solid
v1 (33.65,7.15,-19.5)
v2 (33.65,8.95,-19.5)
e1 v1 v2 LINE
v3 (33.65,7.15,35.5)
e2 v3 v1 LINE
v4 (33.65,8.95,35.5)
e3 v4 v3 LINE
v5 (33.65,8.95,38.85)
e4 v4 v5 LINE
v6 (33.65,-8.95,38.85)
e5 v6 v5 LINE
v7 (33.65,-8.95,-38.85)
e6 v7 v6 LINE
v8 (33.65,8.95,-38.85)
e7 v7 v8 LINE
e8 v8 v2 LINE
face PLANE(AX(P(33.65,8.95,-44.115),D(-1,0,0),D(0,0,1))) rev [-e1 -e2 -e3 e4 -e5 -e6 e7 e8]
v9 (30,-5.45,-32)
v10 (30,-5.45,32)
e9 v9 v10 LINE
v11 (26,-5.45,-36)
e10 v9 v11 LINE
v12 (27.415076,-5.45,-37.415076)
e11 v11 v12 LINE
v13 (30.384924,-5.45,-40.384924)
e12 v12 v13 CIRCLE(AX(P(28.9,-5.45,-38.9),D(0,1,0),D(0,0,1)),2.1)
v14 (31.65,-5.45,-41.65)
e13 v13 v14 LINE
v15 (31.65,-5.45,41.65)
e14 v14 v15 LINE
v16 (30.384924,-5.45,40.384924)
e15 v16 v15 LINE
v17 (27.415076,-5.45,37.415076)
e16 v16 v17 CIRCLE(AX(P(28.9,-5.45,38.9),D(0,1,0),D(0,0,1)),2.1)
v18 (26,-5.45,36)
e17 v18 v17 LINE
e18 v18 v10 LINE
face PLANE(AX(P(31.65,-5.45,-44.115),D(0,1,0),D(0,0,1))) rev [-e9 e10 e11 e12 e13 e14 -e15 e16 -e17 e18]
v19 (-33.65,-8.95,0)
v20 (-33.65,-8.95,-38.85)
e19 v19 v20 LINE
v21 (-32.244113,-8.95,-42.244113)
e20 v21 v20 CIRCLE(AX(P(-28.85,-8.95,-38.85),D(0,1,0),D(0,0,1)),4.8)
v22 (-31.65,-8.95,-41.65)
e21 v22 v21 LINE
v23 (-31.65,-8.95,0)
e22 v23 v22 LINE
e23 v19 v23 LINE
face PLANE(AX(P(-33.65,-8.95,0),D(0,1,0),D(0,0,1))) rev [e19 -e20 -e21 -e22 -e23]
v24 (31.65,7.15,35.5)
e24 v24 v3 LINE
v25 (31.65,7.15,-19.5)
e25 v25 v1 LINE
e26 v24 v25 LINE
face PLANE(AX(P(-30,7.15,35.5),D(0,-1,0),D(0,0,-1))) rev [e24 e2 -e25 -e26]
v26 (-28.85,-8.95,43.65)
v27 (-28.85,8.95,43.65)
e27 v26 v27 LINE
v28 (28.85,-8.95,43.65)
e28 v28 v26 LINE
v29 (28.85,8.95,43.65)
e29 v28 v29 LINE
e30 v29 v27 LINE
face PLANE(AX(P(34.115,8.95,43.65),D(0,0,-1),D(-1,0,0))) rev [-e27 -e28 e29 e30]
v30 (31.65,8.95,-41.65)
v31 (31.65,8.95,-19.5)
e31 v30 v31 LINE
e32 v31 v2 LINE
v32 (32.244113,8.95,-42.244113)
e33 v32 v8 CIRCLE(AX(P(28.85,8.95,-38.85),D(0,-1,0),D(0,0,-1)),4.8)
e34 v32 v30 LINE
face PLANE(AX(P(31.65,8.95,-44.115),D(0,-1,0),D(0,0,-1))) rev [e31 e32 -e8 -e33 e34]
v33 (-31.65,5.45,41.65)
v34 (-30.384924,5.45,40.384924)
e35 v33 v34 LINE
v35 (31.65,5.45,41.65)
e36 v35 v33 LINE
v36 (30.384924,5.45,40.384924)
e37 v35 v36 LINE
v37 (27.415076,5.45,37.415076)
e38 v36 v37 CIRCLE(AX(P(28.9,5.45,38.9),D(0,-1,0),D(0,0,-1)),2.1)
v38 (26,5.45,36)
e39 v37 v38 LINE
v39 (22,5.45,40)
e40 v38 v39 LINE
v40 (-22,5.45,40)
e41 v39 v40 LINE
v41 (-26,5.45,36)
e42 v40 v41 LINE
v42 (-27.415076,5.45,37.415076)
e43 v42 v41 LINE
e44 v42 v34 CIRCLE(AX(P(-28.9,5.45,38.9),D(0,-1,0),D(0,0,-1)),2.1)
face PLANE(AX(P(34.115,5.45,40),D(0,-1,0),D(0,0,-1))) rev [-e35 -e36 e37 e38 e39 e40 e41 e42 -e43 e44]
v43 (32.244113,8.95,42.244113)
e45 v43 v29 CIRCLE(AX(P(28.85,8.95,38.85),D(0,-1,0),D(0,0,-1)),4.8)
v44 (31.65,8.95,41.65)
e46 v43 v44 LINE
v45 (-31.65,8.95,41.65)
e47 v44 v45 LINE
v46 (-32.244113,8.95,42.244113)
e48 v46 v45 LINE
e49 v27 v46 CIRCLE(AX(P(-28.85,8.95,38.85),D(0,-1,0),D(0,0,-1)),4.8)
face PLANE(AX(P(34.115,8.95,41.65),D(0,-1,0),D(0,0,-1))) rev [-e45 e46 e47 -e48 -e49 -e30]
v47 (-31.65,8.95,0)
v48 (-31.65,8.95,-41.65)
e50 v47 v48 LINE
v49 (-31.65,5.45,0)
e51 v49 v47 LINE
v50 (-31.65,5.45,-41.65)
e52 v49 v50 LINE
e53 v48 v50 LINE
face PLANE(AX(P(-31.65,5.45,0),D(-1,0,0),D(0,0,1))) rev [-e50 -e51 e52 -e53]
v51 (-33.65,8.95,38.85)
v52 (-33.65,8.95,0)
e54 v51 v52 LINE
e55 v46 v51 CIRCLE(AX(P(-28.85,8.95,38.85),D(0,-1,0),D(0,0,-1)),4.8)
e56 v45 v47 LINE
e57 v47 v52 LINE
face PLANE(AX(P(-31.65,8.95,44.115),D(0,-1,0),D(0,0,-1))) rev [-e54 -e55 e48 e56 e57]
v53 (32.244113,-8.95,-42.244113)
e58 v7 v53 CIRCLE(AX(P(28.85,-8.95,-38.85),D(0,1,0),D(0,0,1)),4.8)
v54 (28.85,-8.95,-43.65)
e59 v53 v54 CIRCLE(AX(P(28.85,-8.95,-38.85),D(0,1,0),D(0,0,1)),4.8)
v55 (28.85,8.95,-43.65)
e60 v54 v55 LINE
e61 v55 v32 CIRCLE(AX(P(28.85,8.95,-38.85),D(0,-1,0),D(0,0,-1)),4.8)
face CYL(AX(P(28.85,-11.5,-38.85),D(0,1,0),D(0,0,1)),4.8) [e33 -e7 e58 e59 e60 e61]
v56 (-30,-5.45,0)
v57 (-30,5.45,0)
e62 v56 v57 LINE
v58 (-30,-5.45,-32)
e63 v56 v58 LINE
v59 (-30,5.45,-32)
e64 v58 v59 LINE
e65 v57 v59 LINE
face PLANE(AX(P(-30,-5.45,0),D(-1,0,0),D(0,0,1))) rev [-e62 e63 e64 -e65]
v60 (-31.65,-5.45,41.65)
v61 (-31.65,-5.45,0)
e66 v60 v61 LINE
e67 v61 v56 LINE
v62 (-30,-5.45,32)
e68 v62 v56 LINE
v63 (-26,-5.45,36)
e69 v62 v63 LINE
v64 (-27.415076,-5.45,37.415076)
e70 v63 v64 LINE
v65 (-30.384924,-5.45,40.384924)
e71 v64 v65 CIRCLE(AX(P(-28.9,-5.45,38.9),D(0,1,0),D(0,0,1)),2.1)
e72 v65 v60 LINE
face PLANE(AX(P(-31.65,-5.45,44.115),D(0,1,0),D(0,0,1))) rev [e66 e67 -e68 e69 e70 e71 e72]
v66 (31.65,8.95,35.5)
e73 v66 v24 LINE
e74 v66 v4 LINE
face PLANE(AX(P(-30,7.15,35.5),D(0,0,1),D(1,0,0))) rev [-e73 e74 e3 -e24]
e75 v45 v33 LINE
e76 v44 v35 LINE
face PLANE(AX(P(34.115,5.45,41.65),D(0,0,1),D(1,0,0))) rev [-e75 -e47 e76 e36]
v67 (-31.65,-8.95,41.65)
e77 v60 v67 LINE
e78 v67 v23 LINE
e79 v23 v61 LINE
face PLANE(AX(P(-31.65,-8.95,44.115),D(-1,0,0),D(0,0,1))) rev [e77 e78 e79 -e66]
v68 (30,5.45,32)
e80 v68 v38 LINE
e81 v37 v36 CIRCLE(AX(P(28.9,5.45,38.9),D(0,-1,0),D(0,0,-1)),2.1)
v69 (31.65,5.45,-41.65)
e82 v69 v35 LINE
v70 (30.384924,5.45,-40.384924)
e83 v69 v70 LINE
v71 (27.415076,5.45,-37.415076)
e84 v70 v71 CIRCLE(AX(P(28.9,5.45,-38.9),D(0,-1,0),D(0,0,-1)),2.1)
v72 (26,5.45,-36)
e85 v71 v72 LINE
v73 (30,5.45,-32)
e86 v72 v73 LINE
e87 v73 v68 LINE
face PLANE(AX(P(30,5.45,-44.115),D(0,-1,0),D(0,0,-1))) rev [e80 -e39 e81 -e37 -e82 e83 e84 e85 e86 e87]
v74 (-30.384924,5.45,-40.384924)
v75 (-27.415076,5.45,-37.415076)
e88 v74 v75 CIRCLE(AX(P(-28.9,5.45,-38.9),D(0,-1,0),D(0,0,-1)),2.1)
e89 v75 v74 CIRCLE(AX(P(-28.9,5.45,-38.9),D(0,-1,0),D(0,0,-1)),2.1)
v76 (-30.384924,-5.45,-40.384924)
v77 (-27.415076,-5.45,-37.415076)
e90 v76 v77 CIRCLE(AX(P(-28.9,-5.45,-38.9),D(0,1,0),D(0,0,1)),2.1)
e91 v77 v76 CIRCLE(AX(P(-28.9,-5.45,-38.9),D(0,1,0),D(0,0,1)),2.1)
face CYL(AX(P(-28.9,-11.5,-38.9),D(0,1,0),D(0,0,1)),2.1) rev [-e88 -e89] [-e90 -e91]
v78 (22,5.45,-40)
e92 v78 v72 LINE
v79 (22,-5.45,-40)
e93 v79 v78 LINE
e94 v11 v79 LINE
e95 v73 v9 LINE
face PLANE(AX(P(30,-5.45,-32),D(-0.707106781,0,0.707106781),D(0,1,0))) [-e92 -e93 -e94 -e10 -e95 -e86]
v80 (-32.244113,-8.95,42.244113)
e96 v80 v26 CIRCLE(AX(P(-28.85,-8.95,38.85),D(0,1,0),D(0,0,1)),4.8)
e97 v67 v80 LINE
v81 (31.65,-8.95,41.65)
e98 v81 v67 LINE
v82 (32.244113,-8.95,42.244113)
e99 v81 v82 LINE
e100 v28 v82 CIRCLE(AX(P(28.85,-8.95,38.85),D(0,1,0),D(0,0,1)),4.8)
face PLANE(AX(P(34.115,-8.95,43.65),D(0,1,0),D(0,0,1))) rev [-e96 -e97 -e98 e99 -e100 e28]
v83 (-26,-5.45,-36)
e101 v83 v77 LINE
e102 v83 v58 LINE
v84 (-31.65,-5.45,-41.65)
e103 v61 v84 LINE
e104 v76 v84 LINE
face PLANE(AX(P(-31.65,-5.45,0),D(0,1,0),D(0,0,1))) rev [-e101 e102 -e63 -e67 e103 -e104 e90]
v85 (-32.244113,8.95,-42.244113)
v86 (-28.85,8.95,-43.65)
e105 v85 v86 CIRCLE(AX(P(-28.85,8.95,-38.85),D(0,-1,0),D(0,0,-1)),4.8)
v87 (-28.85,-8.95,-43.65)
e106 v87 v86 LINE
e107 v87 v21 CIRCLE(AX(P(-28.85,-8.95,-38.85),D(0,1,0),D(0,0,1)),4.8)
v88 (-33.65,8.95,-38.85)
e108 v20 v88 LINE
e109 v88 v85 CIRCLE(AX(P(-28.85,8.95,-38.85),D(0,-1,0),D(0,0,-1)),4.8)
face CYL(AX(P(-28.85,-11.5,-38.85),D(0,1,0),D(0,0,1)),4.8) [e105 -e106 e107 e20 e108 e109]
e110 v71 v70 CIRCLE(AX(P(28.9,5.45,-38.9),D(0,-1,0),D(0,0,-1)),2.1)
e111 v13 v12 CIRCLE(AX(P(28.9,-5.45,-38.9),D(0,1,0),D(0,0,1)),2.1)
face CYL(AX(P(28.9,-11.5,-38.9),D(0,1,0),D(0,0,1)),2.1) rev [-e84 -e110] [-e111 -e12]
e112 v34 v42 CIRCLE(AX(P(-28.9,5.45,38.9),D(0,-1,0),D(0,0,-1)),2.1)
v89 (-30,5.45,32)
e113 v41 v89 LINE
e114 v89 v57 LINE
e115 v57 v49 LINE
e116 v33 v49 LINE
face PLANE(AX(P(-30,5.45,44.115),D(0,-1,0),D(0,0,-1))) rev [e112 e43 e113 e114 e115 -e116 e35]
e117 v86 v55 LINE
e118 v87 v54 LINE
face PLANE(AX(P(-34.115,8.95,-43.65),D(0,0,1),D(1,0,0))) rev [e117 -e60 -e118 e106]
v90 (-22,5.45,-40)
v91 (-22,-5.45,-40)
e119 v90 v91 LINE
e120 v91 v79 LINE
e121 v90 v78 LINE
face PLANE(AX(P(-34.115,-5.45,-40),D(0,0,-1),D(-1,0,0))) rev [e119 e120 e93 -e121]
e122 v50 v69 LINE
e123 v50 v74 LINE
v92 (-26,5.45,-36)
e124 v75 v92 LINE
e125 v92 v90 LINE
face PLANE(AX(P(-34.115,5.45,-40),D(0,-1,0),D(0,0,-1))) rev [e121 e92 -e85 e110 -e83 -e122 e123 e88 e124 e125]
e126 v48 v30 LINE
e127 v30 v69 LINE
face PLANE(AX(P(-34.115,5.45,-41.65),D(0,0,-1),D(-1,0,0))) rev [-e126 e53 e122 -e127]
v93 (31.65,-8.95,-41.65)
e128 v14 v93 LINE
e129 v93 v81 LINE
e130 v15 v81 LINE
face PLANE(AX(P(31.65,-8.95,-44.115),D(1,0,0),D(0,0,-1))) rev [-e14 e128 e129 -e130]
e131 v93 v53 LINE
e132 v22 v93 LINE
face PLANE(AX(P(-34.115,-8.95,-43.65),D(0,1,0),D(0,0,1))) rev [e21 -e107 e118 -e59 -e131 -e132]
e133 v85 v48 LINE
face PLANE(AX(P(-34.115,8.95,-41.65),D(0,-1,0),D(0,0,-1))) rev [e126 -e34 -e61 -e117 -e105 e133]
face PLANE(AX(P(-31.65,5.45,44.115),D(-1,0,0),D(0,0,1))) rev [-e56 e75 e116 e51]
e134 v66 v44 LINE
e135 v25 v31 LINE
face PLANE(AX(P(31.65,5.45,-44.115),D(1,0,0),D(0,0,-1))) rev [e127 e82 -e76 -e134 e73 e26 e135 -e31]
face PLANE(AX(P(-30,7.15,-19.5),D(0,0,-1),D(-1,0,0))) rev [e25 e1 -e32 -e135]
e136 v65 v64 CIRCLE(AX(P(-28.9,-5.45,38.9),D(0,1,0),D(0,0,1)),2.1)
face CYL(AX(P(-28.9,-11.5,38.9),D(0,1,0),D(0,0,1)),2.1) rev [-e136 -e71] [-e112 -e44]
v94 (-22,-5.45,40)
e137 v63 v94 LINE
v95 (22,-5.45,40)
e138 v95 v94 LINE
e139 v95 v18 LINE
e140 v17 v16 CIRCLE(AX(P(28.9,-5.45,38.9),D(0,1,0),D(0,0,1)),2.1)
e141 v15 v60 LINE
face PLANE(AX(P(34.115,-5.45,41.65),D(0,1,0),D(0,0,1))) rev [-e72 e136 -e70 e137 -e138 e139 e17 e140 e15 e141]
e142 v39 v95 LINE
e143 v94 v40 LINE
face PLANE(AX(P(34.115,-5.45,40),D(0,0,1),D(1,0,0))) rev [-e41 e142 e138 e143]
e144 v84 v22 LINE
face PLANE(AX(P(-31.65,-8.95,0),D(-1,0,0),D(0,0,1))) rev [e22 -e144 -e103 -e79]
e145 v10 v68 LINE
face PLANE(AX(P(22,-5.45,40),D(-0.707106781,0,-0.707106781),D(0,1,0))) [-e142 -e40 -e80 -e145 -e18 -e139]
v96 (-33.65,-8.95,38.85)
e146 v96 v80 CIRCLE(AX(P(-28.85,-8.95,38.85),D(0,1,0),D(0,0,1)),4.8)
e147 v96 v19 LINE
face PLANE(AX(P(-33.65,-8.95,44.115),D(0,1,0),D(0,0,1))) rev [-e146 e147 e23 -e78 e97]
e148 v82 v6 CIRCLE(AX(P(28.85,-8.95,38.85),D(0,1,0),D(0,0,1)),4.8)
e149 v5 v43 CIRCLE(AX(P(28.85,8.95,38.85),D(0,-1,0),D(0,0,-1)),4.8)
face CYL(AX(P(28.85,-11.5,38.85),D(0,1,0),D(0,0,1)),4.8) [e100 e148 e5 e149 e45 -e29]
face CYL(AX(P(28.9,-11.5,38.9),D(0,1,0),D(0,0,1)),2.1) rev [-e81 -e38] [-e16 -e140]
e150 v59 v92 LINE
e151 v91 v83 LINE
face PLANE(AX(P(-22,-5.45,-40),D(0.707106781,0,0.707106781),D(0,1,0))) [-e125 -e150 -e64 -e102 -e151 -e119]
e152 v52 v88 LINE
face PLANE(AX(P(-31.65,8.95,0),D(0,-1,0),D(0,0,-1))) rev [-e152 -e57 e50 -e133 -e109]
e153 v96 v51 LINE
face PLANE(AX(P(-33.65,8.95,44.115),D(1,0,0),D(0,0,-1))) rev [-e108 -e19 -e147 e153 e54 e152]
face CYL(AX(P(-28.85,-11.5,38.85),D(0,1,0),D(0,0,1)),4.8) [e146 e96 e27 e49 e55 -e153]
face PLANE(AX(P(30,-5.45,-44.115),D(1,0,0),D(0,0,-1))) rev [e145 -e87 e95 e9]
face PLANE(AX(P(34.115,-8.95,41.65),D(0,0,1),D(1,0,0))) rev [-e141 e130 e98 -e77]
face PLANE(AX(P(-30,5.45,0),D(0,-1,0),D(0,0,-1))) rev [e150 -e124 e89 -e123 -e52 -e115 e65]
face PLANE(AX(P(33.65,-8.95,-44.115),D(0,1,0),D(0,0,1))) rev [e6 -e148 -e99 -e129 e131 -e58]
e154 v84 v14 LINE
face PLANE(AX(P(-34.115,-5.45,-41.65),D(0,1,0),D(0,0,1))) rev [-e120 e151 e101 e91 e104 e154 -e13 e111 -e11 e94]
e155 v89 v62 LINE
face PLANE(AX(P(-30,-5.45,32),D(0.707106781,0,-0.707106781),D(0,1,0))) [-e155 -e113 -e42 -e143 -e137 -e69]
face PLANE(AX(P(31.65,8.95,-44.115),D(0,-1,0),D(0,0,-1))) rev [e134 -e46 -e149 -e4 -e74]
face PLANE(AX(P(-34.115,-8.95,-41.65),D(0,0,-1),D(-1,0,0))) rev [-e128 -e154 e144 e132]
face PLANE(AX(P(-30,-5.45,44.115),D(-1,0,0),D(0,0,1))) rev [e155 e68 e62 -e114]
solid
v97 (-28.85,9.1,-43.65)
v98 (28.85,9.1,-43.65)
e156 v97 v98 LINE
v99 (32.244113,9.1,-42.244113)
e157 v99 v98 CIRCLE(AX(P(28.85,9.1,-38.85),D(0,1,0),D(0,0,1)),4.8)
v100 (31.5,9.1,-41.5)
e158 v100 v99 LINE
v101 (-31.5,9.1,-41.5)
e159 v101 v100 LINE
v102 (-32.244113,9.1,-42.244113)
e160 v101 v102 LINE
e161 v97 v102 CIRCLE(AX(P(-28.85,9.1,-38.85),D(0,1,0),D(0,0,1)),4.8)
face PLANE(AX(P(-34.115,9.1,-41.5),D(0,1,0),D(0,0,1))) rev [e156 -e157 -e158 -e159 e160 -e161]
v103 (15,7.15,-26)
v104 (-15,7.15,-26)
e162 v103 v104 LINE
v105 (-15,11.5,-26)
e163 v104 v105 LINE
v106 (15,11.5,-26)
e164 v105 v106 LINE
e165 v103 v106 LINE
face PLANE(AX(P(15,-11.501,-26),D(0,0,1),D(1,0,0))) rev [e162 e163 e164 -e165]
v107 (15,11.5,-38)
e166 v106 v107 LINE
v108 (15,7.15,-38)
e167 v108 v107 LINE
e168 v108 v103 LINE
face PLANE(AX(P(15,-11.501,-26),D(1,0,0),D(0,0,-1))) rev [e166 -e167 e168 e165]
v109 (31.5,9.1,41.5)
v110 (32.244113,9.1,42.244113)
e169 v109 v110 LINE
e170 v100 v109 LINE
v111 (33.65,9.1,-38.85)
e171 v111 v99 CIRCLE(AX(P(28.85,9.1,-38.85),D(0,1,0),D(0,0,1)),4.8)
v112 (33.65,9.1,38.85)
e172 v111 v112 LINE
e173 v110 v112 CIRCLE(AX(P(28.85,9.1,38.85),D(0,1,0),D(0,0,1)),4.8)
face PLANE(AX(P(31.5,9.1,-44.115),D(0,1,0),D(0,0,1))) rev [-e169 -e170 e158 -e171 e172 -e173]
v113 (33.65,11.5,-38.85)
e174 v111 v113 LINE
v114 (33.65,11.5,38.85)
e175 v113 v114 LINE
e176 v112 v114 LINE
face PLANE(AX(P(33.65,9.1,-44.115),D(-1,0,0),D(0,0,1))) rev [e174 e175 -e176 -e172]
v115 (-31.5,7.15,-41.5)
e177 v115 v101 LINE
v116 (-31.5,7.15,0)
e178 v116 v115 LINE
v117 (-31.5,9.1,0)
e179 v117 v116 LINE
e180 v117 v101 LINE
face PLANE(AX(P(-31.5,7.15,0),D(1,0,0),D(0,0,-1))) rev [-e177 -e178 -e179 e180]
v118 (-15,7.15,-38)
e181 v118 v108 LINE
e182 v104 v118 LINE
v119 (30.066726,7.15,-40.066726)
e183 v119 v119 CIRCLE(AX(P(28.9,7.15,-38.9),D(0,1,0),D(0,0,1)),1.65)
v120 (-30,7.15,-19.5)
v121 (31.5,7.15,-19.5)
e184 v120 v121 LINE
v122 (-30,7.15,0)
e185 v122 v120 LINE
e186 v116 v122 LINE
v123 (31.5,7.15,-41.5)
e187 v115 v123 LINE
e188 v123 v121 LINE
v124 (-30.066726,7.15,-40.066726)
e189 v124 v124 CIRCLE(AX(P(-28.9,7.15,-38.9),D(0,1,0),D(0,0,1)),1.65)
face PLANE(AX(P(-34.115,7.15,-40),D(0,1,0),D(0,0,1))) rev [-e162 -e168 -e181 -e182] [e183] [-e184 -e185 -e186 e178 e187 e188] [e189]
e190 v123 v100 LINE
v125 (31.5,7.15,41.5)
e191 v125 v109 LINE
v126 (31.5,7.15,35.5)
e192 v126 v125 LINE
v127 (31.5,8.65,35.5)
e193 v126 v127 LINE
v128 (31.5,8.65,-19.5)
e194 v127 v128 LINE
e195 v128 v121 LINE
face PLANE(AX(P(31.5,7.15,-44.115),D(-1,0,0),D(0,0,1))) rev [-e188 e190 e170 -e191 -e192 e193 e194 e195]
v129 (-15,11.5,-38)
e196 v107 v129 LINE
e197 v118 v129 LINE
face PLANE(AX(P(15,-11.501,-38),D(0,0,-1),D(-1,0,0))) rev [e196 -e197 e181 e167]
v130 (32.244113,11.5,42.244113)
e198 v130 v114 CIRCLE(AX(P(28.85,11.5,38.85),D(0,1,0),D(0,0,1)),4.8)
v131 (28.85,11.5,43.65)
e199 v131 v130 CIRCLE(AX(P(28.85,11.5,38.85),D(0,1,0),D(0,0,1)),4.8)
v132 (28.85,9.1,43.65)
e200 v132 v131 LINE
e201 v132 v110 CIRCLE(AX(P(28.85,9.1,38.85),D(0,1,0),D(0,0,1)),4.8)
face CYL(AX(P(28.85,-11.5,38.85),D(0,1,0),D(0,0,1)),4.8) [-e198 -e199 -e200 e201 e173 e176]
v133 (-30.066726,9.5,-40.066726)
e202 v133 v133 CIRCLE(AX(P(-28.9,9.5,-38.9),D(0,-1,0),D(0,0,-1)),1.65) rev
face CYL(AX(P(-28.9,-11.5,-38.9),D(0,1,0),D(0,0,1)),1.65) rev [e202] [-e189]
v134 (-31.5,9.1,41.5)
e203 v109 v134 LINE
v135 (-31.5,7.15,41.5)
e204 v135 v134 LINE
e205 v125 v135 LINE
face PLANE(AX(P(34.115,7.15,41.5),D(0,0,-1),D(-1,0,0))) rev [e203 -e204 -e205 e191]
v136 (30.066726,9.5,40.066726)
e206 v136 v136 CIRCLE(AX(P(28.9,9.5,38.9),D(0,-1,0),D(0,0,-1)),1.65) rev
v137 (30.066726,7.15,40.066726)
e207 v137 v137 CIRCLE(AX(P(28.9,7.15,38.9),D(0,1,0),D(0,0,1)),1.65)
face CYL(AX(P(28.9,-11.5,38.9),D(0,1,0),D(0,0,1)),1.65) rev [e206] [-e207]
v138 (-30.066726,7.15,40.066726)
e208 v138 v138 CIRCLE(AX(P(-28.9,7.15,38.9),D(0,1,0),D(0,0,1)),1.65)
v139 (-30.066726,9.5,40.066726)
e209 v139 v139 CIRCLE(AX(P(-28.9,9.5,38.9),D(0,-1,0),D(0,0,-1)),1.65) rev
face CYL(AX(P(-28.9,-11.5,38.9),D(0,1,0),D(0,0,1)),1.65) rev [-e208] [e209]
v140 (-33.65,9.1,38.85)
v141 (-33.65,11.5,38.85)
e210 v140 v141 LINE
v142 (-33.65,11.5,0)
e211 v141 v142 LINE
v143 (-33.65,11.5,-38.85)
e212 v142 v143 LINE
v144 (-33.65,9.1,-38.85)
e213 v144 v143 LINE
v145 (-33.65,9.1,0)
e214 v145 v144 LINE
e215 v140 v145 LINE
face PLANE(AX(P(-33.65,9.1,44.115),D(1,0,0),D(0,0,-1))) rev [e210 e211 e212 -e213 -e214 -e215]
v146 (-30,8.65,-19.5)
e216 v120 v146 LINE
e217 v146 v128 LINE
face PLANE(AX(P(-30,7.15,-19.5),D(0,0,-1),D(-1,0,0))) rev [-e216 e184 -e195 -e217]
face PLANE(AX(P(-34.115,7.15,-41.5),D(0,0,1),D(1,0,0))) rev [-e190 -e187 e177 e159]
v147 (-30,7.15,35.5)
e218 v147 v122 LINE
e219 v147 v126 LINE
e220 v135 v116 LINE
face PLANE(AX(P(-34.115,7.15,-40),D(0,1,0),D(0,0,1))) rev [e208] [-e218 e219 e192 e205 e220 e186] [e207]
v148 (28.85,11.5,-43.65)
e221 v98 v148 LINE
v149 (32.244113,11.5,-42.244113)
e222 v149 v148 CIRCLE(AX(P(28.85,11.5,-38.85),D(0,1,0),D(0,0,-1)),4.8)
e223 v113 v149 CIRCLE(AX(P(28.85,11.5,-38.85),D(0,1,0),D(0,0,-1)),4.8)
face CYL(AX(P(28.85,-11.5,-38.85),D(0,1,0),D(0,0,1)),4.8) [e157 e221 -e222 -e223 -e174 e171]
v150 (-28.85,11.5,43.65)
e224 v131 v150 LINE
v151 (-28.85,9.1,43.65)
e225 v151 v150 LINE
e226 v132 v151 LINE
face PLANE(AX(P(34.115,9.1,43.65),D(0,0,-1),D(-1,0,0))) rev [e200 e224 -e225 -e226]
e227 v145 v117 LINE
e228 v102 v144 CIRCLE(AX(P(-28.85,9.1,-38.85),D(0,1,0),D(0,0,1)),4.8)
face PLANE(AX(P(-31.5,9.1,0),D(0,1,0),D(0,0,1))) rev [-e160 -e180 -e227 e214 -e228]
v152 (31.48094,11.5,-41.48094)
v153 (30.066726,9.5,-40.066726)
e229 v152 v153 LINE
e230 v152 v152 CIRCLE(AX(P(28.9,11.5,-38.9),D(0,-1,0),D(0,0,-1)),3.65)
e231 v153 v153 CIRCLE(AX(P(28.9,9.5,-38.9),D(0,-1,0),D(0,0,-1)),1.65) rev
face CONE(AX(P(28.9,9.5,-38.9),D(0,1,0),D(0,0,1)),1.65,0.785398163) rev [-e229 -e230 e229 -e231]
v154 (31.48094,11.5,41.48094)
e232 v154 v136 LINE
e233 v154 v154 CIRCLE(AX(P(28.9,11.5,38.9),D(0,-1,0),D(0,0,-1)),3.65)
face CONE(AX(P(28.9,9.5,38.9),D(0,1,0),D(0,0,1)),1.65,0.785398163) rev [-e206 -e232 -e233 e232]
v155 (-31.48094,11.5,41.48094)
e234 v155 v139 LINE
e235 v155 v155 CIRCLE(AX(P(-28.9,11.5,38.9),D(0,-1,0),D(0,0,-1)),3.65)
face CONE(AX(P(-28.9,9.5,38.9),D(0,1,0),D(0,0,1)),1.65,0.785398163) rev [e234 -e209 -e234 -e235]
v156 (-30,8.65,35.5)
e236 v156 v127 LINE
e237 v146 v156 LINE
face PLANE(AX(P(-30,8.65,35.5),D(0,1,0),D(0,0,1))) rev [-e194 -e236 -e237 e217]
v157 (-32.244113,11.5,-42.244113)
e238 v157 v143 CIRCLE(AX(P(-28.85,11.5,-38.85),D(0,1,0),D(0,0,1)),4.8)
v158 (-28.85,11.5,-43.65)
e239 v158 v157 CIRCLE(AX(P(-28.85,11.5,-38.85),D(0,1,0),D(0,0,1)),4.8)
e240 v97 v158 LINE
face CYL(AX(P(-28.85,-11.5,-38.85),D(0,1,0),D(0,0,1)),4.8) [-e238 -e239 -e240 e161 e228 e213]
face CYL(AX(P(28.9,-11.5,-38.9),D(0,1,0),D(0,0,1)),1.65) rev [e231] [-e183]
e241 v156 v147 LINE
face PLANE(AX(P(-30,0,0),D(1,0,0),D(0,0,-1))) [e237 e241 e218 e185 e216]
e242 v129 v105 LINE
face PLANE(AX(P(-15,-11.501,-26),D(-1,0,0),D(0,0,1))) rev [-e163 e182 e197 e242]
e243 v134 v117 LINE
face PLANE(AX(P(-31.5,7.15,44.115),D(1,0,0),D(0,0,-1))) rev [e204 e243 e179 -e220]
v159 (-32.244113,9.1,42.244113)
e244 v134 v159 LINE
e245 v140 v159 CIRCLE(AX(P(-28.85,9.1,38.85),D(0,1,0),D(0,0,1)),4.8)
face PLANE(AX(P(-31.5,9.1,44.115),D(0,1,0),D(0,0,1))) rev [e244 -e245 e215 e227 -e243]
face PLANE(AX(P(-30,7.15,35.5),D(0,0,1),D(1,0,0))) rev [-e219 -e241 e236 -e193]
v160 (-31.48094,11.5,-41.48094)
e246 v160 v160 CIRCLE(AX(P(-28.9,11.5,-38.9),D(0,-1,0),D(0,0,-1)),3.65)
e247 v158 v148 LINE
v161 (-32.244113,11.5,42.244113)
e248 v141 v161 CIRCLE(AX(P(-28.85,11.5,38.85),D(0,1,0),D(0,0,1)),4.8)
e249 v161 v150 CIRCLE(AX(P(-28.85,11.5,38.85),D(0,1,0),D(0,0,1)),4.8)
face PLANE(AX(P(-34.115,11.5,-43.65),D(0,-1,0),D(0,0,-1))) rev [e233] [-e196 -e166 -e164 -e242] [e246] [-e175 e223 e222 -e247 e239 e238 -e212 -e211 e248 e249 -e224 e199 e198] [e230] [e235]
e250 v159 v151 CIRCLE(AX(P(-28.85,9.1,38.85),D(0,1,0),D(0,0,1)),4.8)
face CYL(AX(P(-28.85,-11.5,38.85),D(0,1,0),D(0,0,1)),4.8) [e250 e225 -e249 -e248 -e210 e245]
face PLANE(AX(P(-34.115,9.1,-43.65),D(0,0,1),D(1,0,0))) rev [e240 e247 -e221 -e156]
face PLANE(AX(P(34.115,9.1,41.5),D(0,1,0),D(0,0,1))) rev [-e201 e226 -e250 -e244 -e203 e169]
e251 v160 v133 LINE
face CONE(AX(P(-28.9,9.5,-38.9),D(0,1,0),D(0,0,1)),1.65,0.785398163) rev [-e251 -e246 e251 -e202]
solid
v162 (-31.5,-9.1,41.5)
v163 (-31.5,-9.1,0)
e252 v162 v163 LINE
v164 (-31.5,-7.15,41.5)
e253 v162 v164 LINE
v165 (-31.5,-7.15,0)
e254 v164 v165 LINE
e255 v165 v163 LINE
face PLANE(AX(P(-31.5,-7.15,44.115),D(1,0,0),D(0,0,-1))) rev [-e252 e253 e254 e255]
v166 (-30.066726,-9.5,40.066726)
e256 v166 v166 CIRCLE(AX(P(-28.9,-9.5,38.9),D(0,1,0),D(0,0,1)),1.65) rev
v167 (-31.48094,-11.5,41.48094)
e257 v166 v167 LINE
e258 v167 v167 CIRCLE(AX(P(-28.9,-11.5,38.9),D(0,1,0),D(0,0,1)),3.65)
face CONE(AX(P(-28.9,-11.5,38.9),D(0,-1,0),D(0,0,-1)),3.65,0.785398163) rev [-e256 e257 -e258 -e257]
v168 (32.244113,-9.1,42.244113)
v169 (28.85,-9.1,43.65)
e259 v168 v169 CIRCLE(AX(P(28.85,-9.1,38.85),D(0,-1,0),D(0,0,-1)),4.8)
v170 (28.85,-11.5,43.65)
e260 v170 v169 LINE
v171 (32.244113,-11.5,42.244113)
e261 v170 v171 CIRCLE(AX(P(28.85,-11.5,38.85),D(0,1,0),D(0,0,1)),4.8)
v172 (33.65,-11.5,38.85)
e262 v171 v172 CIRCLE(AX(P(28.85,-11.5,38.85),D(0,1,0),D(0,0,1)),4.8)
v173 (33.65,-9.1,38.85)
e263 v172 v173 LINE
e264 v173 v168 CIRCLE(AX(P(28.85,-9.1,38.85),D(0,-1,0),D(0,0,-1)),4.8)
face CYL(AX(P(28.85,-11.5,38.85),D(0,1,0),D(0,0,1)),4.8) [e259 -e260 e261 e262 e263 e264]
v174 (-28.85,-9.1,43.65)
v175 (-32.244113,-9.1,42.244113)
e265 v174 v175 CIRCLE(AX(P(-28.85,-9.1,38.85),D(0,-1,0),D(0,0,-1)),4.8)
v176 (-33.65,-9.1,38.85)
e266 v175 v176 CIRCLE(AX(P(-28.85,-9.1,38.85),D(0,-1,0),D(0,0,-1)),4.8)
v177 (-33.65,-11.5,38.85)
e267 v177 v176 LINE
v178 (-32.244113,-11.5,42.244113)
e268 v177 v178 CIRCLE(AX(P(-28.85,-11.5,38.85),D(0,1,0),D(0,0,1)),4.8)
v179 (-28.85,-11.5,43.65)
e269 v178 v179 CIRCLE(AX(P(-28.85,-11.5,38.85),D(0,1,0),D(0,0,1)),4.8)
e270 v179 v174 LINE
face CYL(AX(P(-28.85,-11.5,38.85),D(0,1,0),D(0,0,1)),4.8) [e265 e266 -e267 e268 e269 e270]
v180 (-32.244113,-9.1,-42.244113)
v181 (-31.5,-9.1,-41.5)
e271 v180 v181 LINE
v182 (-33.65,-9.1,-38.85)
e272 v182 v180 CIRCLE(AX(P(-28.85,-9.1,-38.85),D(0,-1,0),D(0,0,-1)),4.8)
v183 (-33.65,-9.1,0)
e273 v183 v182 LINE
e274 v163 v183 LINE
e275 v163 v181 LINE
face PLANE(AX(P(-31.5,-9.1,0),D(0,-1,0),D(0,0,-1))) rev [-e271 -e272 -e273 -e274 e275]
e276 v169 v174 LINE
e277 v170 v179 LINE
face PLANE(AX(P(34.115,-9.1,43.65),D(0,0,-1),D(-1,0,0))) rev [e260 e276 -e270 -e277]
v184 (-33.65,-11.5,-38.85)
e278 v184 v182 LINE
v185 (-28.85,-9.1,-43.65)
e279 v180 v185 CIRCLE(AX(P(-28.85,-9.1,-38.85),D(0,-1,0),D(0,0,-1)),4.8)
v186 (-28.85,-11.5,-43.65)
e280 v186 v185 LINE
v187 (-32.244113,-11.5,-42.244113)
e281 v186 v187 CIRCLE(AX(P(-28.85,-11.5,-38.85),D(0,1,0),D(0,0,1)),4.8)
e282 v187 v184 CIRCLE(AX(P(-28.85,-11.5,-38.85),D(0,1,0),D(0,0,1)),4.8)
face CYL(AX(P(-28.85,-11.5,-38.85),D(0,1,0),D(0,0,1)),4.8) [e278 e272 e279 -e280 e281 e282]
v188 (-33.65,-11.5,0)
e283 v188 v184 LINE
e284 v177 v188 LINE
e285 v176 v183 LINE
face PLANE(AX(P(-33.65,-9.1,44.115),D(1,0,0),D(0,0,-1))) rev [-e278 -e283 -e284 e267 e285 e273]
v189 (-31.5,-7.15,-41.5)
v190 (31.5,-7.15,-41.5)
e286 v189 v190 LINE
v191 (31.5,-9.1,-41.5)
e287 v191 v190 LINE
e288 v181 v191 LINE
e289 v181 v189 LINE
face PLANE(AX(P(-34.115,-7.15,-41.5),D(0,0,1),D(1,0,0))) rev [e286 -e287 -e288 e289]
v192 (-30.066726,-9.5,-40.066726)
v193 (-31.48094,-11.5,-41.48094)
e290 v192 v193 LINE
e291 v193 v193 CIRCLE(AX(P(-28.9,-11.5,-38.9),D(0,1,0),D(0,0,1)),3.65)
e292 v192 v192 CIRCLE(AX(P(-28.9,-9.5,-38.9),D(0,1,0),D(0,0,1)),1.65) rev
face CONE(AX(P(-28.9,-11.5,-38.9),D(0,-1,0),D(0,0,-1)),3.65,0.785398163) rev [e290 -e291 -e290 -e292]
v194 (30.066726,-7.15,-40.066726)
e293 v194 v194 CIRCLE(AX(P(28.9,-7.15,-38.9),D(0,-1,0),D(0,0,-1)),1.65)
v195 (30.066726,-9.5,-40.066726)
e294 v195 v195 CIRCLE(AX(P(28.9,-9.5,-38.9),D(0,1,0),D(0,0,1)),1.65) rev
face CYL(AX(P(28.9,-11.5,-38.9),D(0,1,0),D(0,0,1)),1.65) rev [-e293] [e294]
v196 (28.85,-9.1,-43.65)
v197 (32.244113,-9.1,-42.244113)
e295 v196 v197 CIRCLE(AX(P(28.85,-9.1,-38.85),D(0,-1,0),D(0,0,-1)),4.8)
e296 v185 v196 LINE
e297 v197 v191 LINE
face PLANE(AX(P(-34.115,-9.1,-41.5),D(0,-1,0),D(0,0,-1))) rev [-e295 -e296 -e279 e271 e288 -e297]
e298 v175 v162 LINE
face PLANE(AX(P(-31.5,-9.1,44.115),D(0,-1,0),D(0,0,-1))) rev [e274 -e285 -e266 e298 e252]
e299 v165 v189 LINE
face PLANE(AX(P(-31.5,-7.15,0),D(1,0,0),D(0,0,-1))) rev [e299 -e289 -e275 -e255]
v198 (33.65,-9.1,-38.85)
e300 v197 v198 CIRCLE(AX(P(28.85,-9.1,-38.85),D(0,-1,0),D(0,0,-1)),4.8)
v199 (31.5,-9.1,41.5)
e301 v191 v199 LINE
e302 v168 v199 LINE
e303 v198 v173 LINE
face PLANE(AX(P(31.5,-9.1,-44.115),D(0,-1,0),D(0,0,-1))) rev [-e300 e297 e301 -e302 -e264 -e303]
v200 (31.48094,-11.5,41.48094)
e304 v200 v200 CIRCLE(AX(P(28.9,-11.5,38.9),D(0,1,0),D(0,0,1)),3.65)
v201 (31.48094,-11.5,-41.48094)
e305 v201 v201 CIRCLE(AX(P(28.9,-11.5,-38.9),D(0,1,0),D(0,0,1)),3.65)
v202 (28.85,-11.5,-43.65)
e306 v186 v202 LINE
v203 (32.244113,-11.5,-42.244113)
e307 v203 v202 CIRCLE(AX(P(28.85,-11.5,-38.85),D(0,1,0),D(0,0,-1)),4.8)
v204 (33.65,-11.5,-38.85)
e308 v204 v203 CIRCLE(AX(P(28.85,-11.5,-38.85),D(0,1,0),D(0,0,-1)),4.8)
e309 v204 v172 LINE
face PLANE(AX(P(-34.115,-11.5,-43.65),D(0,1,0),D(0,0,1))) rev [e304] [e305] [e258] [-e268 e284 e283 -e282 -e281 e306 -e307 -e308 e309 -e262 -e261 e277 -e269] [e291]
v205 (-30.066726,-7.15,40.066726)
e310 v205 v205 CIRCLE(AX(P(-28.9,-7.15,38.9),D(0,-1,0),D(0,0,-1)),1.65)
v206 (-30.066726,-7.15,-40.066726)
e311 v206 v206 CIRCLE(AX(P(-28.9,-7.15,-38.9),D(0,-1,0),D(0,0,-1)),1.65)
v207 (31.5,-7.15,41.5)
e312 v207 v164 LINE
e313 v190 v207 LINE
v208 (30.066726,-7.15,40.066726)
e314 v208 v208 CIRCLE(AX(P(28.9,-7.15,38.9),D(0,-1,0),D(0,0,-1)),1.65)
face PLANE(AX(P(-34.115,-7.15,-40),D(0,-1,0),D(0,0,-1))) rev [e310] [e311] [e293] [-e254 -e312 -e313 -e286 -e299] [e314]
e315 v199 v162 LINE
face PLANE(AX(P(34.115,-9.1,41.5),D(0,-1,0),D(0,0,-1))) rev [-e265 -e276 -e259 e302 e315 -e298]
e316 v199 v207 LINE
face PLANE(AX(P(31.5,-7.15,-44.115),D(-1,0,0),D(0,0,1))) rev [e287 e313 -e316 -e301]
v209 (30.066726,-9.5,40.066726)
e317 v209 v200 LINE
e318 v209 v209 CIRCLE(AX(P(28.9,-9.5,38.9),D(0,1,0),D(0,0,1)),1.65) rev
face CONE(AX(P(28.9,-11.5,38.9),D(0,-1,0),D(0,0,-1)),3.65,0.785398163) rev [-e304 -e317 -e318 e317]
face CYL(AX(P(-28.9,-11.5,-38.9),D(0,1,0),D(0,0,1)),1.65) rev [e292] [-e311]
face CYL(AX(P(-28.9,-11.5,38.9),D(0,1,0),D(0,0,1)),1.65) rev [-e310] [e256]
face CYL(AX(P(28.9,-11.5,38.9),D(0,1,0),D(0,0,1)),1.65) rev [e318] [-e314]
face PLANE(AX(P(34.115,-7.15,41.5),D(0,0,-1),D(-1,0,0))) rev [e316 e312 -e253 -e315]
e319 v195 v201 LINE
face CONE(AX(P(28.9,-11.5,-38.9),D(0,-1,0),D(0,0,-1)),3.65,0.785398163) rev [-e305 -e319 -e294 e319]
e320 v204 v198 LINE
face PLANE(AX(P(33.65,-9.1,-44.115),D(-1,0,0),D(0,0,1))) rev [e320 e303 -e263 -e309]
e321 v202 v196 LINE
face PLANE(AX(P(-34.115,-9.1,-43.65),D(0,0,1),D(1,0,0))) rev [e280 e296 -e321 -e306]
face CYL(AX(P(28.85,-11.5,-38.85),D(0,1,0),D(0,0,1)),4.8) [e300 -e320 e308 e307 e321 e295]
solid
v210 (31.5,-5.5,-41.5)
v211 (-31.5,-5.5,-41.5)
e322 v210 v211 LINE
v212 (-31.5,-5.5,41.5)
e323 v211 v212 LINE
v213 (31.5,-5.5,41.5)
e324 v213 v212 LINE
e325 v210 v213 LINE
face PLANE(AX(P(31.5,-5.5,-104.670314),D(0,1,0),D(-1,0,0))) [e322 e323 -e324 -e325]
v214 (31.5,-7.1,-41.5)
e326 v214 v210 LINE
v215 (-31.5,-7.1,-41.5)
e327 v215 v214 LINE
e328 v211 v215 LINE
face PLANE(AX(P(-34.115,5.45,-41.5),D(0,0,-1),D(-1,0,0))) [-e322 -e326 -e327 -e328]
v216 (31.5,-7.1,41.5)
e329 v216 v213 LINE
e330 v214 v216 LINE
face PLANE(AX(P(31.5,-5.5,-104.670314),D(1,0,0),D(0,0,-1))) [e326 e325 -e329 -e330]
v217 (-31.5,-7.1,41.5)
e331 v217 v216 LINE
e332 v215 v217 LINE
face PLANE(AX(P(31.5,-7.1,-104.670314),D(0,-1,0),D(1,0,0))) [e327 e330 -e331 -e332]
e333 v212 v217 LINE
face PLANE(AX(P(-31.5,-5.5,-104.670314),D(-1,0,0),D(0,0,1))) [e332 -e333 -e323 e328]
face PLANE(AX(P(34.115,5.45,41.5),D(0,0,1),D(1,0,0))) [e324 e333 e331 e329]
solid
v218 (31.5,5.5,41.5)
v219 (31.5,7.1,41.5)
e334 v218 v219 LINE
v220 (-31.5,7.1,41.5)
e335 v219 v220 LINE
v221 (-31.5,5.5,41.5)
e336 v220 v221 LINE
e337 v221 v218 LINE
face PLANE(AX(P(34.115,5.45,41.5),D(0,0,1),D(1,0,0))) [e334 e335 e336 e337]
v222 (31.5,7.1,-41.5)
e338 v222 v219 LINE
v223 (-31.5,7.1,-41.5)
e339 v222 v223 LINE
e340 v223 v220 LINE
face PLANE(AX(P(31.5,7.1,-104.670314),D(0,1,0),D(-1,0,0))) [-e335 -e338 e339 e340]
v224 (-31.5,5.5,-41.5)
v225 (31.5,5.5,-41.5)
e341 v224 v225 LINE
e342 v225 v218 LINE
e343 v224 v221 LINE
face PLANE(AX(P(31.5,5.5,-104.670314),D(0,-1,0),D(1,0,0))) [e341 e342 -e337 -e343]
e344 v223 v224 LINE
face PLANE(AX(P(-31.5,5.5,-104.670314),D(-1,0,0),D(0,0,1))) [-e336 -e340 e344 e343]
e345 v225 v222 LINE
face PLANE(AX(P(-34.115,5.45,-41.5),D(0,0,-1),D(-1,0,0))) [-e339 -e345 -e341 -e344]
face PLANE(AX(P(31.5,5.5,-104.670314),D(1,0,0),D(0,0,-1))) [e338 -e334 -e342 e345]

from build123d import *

# Parameters (mm, degrees)
MATERIAL_BOHRUNGEN_SIZE        = 8
SKETCH7_W                      = 60
SKETCH7_H                      = 80
TOP_DEPTH                      = 4.35
SKETCH9_W                      = 60
SKETCH9_H                      = 80
BOT_DEPTH                      = 4.35
RADIUS_AUSSENKANTEN_DEPTH      = 57.301820574
RADIUS_AUSSENKANTEN_DEPTH_BACK = 57.301820574
SKETCH8_OUTSIDE_W              = 91.82
SKETCH8_OUTSIDE_H              = 111.82
BOHRUNGEN_START                = -5.45
BOHRUNGEN_4MM_OUTLINE_R        = 2.1
BOHRUNGEN_4MM_DEPTH            = 10.9
BOHRUNGEN_3MM_DEPTH            = 57.301820574
BOHRUNGEN_3MM_DEPTH_BACK       = 57.301820574
SKETCH10_R                     = 1.65
BOHRUNGEN_FASE_1_SIZE          = 2
BOHRUNGEN_FASE_2_SIZE          = 2
KARTENSCHLITZ_DEPTH            = 57.301820574
KARTENSCHLITZ_DEPTH_BACK       = 30
SKETCH12_W                     = 55
SKETCH12_H                     = 1.5
CUT_EXTRUDE5_START             = 31.65
SKETCH13_W                     = 55
SKETCH13_H                     = 0.3
CUT_EXTRUDE5_DEPTH             = 2
BOSS_EXTRUDE3_DEPTH            = 41.5
BOSS_EXTRUDE3_DEPTH_BACK       = 41.5
SKETCH14_W                     = 63
SKETCH14_H                     = 1.6
BOSS_EXTRUDE3_2_DEPTH          = 41.5
BOSS_EXTRUDE3_2_DEPTH_BACK     = 41.5
SKETCH15_W                     = 30
SKETCH15_H                     = 12
CUT_EXTRUDE6_DEPTH             = 4.35


# Read off the part's stored shape, not the designer's step: Bohrungen 4mm
with BuildPart() as part:
    # Mid: sweep along a path in Path
    with BuildLine(Plane(origin=(0, 0, 0), x_dir=(1, 0, 0), z_dir=(0, 1, 0))) as mid_path:
        Line((30, -40), (-30, -40))
        Line((-30, -40), (-30, 40))
        Line((-30, 40), (30, 40))
        Line((30, 40), (30, -40))
    # Profile → Mid (sweep)
    with BuildSketch(Plane.XY):
        Polygon((-33.65, -8.95), (-31.65, -8.95), (-31.65, -5.45), (-30, -5.45), (-30, 5.45), (-31.65, 5.45), (-31.65, 8.95), (-33.65, 8.95), align=None)
        Polygon((-30, 7.15), (-31.5, 7.15), (-31.5, 9.1), (-33.65, 9.1), (-33.65, 11.5), (-30, 11.5), align=None)
        Polygon((-33.65, -11.5), (-30, -11.5), (-30, -7.15), (-31.5, -7.15), (-31.5, -9.1), (-33.65, -9.1), align=None)
    sweep(path=mid_path.line, transition=Transition.RIGHT)

    # Material Bohrungen
    material_bohrungen_edges = [part.edges().sort_by_distance(p)[0] for p in [
        (30, 0, 40),
        (-30, 0, 40),
        (30, 0, -40),
        (-30, 0, -40),
    ]]
    chamfer(material_bohrungen_edges, length=MATERIAL_BOHRUNGEN_SIZE)

    # Sketch7 → Top (add)
    with BuildSketch(Plane(origin=(0, 11.5, 0), x_dir=(1, 0, 0), z_dir=(0, 1, 0))):
        Rectangle(SKETCH7_W, SKETCH7_H)
    extrude(amount=-TOP_DEPTH)

    # Sketch9 → Bot (add)
    with BuildSketch(Plane.XZ.offset(11.5)):
        Rectangle(SKETCH9_W, SKETCH9_H)
    extrude(amount=-BOT_DEPTH)

    # Sketch8 outside → Radius Aussenkanten (cut, two sides: drawn at the far end of the back side and taken through both)
    with BuildSketch(Plane(origin=(0, 0, 0), x_dir=(1, 0, 0), z_dir=(0, 1, 0)).offset(-RADIUS_AUSSENKANTEN_DEPTH_BACK)):
        Rectangle(SKETCH8_OUTSIDE_W, SKETCH8_OUTSIDE_H)
        with BuildLine():
            Line((-28.85, 43.65), (28.85, 43.65))
            ThreePointArc((28.85, 43.65), (32.24411255, 42.24411255), (33.65, 38.85))
            Line((33.65, 38.85), (33.65, -38.85))
            ThreePointArc((33.65, -38.85), (32.24411255, -42.24411255), (28.85, -43.65))
            Line((28.85, -43.65), (-28.85, -43.65))
            ThreePointArc((-28.85, -43.65), (-32.24411255, -42.24411255), (-33.65, -38.85))
            Line((-33.65, -38.85), (-33.65, 38.85))
            ThreePointArc((-33.65, 38.85), (-32.24411255, 42.24411255), (-28.85, 43.65))
        make_face(mode=Mode.SUBTRACT)
    extrude(amount=RADIUS_AUSSENKANTEN_DEPTH + RADIUS_AUSSENKANTEN_DEPTH_BACK, mode=Mode.SUBTRACT)

    # Bohrungen 4mm outline → Bohrungen 4mm (cut)
    with BuildSketch(Plane(origin=(0, 0, 0), x_dir=(1, 0, 0), z_dir=(0, 1, 0)).offset(BOHRUNGEN_START)):
        with Locations((-28.9, 38.9)):
            Circle(BOHRUNGEN_4MM_OUTLINE_R)
        with Locations((28.9, 38.9)):
            Circle(BOHRUNGEN_4MM_OUTLINE_R)
        with Locations((28.9, -38.9)):
            Circle(BOHRUNGEN_4MM_OUTLINE_R)
        with Locations((-28.9, -38.9)):
            Circle(BOHRUNGEN_4MM_OUTLINE_R)
    extrude(amount=BOHRUNGEN_4MM_DEPTH, mode=Mode.SUBTRACT)

    # Sketch10 → Bohrungen 3mm (cut, two sides: drawn at the far end of the back side and taken through both)
    with BuildSketch(Plane(origin=(0, 0, 0), x_dir=(1, 0, 0), z_dir=(0, 1, 0)).offset(-BOHRUNGEN_3MM_DEPTH_BACK)):
        with Locations(Location((-28.9, 38.9, 0), (0, 0, 135))):
            Circle(SKETCH10_R)
        with Locations(Location((28.9, 38.9, 0), (0, 0, 45))):
            Circle(SKETCH10_R)
        with Locations(Location((28.9, -38.9, 0), (0, 0, 315))):
            Circle(SKETCH10_R)
        with Locations(Location((-28.9, -38.9, 0), (0, 0, 225))):
            Circle(SKETCH10_R)
    extrude(amount=BOHRUNGEN_3MM_DEPTH + BOHRUNGEN_3MM_DEPTH_BACK, mode=Mode.SUBTRACT)

    # Bohrungen Fase 1
    bohrungen_fase_1_edges = [part.edges().sort_by_distance(p)[0] for p in [
        (-27.733273811, 11.5, -37.733273811),
        (27.733273811, 11.5, -37.733273811),
        (27.733273811, 11.5, 37.733273811),
        (-27.733273811, 11.5, 37.733273811),
    ]]
    chamfer(bohrungen_fase_1_edges, length=BOHRUNGEN_FASE_1_SIZE)

    # Bohrungen Fase 2
    bohrungen_fase_2_edges = [part.edges().sort_by_distance(p)[0] for p in [
        (-27.733273811, -11.5, -37.733273811),
        (27.733273811, -11.5, -37.733273811),
        (27.733273811, -11.5, 37.733273811),
        (-27.733273811, -11.5, 37.733273811),
    ]]
    chamfer(bohrungen_fase_2_edges, length=BOHRUNGEN_FASE_2_SIZE)

    # Sketch12 → Kartenschlitz (cut, two sides: drawn at the far end of the back side and taken through both)
    with BuildSketch(Plane(origin=(0, 0, 0), x_dir=(0, 0, -1), z_dir=(1, 0, 0)).offset(-KARTENSCHLITZ_DEPTH_BACK)):
        with Locations((-8, 7.9)):
            Rectangle(SKETCH12_W, SKETCH12_H)
    extrude(amount=KARTENSCHLITZ_DEPTH + KARTENSCHLITZ_DEPTH_BACK, mode=Mode.SUBTRACT)

    # Sketch13 → Cut-Extrude5 (cut)
    with BuildSketch(Plane(origin=(0, 0, 0), x_dir=(0, 0, -1), z_dir=(1, 0, 0)).offset(CUT_EXTRUDE5_START)):
        with Locations((-8, 8.8)):
            Rectangle(SKETCH13_W, SKETCH13_H)
    extrude(amount=CUT_EXTRUDE5_DEPTH, mode=Mode.SUBTRACT)

    # Sketch15 → Cut-Extrude6 (cut)
    with BuildSketch(Plane(origin=(0, 11.5, 0), x_dir=(1, 0, 0), z_dir=(0, 1, 0))):
        with Locations((0, 32)):
            Rectangle(SKETCH15_W, SKETCH15_H)
    extrude(amount=-CUT_EXTRUDE6_DEPTH, mode=Mode.SUBTRACT)


with BuildPart() as body_2:
    # Sketch14 → Boss-Extrude3 (new, two sides: drawn at the far end of the back side and taken through both)
    with BuildSketch(Plane.XY.offset(-BOSS_EXTRUDE3_DEPTH_BACK)):
        with Locations((0, -6.3)):
            Rectangle(SKETCH14_W, SKETCH14_H)
    extrude(amount=BOSS_EXTRUDE3_DEPTH + BOSS_EXTRUDE3_DEPTH_BACK)


with BuildPart() as body_3:
    # Sketch14 → Boss-Extrude3 2 (new, two sides: drawn at the far end of the back side and taken through both)
    with BuildSketch(Plane.XY.offset(-BOSS_EXTRUDE3_2_DEPTH_BACK)):
        with Locations((0, 6.3)):
            Rectangle(SKETCH14_W, SKETCH14_H)
    extrude(amount=BOSS_EXTRUDE3_2_DEPTH + BOSS_EXTRUDE3_2_DEPTH_BACK)


solid = Compound([part.part, body_2.part, body_3.part])
